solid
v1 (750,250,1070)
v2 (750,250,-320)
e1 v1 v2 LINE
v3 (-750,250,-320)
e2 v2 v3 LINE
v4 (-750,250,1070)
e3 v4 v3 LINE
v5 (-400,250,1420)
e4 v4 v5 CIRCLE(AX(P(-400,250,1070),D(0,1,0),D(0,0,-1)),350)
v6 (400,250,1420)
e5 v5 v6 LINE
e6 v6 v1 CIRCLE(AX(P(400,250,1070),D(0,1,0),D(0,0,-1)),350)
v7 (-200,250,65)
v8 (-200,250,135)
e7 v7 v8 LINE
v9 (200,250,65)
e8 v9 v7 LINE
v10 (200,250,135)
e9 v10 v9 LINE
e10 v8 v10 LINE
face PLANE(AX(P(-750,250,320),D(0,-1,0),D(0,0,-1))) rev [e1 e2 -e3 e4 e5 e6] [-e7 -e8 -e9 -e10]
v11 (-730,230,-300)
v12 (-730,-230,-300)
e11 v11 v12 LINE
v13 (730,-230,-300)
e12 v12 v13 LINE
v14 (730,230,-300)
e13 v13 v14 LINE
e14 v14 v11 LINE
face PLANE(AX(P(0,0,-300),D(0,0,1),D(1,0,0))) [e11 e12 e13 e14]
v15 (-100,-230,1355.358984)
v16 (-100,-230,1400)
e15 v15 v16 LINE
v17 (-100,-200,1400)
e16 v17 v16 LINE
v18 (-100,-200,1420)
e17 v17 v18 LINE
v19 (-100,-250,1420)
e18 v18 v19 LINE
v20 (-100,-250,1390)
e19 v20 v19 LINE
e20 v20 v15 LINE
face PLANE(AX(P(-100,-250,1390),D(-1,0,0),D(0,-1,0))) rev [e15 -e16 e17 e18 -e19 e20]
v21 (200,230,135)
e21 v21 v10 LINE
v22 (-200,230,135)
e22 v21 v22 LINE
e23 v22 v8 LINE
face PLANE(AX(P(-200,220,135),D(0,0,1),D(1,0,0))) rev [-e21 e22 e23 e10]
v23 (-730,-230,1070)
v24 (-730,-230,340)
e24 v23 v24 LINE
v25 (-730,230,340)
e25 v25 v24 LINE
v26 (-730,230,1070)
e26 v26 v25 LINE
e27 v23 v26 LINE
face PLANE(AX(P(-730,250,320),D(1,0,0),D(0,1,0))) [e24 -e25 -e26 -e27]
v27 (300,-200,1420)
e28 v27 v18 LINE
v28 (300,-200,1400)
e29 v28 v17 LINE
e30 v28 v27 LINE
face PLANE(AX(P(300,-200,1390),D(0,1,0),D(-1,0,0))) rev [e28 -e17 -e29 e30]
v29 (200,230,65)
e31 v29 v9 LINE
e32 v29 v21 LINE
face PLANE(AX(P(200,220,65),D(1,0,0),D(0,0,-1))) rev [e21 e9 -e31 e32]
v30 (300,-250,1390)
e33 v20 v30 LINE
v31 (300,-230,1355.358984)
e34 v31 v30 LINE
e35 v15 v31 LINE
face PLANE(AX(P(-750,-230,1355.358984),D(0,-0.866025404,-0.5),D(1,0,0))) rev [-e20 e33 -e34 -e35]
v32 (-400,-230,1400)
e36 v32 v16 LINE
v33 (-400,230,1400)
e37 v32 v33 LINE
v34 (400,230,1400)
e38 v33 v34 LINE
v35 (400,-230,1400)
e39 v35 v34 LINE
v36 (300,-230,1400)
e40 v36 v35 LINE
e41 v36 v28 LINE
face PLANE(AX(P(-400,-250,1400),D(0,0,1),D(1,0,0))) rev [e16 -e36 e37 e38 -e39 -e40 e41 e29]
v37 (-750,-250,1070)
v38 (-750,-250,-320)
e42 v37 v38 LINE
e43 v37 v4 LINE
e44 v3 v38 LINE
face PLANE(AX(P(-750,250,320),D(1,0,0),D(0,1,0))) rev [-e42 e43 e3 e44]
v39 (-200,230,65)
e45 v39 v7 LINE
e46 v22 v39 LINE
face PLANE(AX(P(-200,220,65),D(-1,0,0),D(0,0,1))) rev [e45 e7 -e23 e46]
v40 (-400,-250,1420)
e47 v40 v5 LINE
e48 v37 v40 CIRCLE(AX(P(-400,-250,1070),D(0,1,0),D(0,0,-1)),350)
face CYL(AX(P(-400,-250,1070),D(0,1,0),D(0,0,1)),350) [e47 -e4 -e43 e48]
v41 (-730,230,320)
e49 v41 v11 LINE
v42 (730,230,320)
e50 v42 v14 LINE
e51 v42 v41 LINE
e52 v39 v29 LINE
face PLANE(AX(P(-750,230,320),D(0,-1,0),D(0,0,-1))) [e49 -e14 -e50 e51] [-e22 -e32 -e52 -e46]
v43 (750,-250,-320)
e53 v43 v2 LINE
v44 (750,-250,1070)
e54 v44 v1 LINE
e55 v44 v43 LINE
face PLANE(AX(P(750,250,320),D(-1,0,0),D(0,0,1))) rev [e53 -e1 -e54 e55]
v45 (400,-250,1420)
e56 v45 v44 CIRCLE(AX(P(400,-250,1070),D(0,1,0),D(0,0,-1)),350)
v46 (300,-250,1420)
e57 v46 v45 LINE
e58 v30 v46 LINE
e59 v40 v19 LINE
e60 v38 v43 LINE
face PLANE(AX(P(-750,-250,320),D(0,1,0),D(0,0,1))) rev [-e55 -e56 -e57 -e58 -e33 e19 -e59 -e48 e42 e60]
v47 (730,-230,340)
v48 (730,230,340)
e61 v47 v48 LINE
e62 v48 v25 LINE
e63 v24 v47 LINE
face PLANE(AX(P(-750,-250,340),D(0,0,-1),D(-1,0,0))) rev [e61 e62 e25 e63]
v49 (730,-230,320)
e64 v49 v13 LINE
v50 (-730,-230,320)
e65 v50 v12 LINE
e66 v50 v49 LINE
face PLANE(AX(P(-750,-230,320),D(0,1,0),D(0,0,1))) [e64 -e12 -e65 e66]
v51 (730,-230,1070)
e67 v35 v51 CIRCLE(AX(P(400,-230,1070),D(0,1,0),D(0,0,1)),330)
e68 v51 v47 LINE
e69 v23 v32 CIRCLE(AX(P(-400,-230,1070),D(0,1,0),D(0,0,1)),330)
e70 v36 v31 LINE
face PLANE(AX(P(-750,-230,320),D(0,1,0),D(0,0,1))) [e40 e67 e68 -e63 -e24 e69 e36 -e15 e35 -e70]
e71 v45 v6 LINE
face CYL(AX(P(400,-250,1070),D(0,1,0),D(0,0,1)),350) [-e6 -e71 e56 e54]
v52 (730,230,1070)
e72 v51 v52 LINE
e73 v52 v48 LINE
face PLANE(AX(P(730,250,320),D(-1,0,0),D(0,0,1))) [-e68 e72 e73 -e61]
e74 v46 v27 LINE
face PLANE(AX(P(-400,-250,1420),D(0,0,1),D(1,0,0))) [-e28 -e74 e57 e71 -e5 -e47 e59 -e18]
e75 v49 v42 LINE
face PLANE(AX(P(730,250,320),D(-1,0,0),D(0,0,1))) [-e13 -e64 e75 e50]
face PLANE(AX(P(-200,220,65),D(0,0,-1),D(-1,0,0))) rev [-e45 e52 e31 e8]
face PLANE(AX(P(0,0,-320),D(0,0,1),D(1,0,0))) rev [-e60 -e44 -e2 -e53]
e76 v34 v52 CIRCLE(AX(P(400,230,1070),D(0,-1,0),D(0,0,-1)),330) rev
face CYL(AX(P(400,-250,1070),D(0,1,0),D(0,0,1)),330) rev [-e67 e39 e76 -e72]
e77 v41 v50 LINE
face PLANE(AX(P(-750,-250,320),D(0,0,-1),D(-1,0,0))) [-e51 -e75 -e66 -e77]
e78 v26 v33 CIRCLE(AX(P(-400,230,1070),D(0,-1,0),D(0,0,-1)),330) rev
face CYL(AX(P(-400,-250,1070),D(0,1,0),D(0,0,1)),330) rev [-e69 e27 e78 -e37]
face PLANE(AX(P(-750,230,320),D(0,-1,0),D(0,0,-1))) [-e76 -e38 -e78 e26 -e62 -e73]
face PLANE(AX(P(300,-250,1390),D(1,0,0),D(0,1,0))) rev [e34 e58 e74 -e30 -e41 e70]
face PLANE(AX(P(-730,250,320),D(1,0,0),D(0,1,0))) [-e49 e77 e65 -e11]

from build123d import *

# Parameters (mm, degrees)
SKETCH1_W           = 1500
SKETCH1_H           = 500
BOSS_EXTRUDE1_DEPTH = 320
SHELL1_T            = 20
SKETCH3_W           = 400
SKETCH3_H           = 70
CUT_EXTRUDE2_DEPTH  = 30
SKETCH4_W           = 1460
SKETCH4_H           = 460
CUT_EXTRUDE3_DEPTH  = 30
BOSS_EXTRUDE2_DEPTH = 500
SHELL2_START        = -230
SHELL2_DEPTH        = 460
SKETCH6_W           = 400
SKETCH6_H           = 50
CUT_EXTRUDE4_DEPTH  = 30
CHAMFER1_SIZE2      = 34.641016151
CHAMFER1_SIZE       = 20


# Read off the part's stored shape, not the designer's step: Shell2
with BuildPart() as part:
    # Sketch1 → Boss-Extrude1 (new, symmetric)
    with BuildSketch(Plane.XY):
        Rectangle(SKETCH1_W, SKETCH1_H)
    extrude(amount=BOSS_EXTRUDE1_DEPTH, both=True)

    # Shell1 (no face opened: a closed hollow body)
    add(offset(amount=-SHELL1_T, mode=Mode.PRIVATE), mode=Mode.SUBTRACT)

    # Sketch3 → Cut-Extrude2 (cut)
    with BuildSketch(Plane(origin=(0, 250, 0), x_dir=(1, 0, 0), z_dir=(0, 1, 0))):
        with Locations((0, -100)):
            Rectangle(SKETCH3_W, SKETCH3_H)
    extrude(amount=-CUT_EXTRUDE2_DEPTH, mode=Mode.SUBTRACT)

    # Sketch4 → Cut-Extrude3 (cut)
    with BuildSketch(Plane.XY.offset(320)):
        Rectangle(SKETCH4_W, SKETCH4_H)
    extrude(amount=-CUT_EXTRUDE3_DEPTH, mode=Mode.SUBTRACT)

    # Sketch5 → Boss-Extrude2 (add)
    with BuildSketch(Plane(origin=(0, 250, 0), x_dir=(1, 0, 0), z_dir=(0, 1, 0))):
        with BuildLine():
            Line((-750, -320), (750, -320))
            Line((750, -320), (750, -1070))
            ThreePointArc((750, -1070), (647.487373415, -1317.487373415), (400, -1420))
            Line((400, -1420), (-400, -1420))
            ThreePointArc((-400, -1420), (-647.487373415, -1317.487373415), (-750, -1070))
            Line((-750, -1070), (-750, -320))
        make_face()
    extrude(amount=-BOSS_EXTRUDE2_DEPTH)

    # Shell2 outline → Shell2 (cut)
    with BuildSketch(Plane(origin=(0, 0, 0), x_dir=(1, 0, 0), z_dir=(0, 1, 0)).offset(SHELL2_START)):
        with BuildLine():
            Line((730, -1070), (730, -340))
            Line((730, -340), (-730, -340))
            Line((-730, -340), (-730, -1070))
            ThreePointArc((-730, -1070), (-633.345237792, -1303.345237792), (-400, -1400))
            Line((-400, -1400), (400, -1400))
            ThreePointArc((400, -1400), (633.345237792, -1303.345237792), (730, -1070))
        make_face()
    extrude(amount=SHELL2_DEPTH, mode=Mode.SUBTRACT)

    # Sketch6 → Cut-Extrude4 (cut)
    with BuildSketch(Plane.XY.offset(1420)):
        with Locations((100, -225)):
            Rectangle(SKETCH6_W, SKETCH6_H)
    extrude(amount=-CUT_EXTRUDE4_DEPTH, mode=Mode.SUBTRACT)

    # Chamfer1
    chamfer1_edges = [part.edges().sort_by_distance(p)[0] for p in [
        (100, -230, 1390),
    ]]
    chamfer1_side = [part.faces().sort_by_distance(p)[0] for p in [
        (100, -230.4, 1390),
    ]]
    chamfer(chamfer1_edges, length=CHAMFER1_SIZE - 0.0001, length2=CHAMFER1_SIZE2 - 0.0001, reference=chamfer1_side[0])  # a hair under: the kernel refuses the full size


solid = part.part
